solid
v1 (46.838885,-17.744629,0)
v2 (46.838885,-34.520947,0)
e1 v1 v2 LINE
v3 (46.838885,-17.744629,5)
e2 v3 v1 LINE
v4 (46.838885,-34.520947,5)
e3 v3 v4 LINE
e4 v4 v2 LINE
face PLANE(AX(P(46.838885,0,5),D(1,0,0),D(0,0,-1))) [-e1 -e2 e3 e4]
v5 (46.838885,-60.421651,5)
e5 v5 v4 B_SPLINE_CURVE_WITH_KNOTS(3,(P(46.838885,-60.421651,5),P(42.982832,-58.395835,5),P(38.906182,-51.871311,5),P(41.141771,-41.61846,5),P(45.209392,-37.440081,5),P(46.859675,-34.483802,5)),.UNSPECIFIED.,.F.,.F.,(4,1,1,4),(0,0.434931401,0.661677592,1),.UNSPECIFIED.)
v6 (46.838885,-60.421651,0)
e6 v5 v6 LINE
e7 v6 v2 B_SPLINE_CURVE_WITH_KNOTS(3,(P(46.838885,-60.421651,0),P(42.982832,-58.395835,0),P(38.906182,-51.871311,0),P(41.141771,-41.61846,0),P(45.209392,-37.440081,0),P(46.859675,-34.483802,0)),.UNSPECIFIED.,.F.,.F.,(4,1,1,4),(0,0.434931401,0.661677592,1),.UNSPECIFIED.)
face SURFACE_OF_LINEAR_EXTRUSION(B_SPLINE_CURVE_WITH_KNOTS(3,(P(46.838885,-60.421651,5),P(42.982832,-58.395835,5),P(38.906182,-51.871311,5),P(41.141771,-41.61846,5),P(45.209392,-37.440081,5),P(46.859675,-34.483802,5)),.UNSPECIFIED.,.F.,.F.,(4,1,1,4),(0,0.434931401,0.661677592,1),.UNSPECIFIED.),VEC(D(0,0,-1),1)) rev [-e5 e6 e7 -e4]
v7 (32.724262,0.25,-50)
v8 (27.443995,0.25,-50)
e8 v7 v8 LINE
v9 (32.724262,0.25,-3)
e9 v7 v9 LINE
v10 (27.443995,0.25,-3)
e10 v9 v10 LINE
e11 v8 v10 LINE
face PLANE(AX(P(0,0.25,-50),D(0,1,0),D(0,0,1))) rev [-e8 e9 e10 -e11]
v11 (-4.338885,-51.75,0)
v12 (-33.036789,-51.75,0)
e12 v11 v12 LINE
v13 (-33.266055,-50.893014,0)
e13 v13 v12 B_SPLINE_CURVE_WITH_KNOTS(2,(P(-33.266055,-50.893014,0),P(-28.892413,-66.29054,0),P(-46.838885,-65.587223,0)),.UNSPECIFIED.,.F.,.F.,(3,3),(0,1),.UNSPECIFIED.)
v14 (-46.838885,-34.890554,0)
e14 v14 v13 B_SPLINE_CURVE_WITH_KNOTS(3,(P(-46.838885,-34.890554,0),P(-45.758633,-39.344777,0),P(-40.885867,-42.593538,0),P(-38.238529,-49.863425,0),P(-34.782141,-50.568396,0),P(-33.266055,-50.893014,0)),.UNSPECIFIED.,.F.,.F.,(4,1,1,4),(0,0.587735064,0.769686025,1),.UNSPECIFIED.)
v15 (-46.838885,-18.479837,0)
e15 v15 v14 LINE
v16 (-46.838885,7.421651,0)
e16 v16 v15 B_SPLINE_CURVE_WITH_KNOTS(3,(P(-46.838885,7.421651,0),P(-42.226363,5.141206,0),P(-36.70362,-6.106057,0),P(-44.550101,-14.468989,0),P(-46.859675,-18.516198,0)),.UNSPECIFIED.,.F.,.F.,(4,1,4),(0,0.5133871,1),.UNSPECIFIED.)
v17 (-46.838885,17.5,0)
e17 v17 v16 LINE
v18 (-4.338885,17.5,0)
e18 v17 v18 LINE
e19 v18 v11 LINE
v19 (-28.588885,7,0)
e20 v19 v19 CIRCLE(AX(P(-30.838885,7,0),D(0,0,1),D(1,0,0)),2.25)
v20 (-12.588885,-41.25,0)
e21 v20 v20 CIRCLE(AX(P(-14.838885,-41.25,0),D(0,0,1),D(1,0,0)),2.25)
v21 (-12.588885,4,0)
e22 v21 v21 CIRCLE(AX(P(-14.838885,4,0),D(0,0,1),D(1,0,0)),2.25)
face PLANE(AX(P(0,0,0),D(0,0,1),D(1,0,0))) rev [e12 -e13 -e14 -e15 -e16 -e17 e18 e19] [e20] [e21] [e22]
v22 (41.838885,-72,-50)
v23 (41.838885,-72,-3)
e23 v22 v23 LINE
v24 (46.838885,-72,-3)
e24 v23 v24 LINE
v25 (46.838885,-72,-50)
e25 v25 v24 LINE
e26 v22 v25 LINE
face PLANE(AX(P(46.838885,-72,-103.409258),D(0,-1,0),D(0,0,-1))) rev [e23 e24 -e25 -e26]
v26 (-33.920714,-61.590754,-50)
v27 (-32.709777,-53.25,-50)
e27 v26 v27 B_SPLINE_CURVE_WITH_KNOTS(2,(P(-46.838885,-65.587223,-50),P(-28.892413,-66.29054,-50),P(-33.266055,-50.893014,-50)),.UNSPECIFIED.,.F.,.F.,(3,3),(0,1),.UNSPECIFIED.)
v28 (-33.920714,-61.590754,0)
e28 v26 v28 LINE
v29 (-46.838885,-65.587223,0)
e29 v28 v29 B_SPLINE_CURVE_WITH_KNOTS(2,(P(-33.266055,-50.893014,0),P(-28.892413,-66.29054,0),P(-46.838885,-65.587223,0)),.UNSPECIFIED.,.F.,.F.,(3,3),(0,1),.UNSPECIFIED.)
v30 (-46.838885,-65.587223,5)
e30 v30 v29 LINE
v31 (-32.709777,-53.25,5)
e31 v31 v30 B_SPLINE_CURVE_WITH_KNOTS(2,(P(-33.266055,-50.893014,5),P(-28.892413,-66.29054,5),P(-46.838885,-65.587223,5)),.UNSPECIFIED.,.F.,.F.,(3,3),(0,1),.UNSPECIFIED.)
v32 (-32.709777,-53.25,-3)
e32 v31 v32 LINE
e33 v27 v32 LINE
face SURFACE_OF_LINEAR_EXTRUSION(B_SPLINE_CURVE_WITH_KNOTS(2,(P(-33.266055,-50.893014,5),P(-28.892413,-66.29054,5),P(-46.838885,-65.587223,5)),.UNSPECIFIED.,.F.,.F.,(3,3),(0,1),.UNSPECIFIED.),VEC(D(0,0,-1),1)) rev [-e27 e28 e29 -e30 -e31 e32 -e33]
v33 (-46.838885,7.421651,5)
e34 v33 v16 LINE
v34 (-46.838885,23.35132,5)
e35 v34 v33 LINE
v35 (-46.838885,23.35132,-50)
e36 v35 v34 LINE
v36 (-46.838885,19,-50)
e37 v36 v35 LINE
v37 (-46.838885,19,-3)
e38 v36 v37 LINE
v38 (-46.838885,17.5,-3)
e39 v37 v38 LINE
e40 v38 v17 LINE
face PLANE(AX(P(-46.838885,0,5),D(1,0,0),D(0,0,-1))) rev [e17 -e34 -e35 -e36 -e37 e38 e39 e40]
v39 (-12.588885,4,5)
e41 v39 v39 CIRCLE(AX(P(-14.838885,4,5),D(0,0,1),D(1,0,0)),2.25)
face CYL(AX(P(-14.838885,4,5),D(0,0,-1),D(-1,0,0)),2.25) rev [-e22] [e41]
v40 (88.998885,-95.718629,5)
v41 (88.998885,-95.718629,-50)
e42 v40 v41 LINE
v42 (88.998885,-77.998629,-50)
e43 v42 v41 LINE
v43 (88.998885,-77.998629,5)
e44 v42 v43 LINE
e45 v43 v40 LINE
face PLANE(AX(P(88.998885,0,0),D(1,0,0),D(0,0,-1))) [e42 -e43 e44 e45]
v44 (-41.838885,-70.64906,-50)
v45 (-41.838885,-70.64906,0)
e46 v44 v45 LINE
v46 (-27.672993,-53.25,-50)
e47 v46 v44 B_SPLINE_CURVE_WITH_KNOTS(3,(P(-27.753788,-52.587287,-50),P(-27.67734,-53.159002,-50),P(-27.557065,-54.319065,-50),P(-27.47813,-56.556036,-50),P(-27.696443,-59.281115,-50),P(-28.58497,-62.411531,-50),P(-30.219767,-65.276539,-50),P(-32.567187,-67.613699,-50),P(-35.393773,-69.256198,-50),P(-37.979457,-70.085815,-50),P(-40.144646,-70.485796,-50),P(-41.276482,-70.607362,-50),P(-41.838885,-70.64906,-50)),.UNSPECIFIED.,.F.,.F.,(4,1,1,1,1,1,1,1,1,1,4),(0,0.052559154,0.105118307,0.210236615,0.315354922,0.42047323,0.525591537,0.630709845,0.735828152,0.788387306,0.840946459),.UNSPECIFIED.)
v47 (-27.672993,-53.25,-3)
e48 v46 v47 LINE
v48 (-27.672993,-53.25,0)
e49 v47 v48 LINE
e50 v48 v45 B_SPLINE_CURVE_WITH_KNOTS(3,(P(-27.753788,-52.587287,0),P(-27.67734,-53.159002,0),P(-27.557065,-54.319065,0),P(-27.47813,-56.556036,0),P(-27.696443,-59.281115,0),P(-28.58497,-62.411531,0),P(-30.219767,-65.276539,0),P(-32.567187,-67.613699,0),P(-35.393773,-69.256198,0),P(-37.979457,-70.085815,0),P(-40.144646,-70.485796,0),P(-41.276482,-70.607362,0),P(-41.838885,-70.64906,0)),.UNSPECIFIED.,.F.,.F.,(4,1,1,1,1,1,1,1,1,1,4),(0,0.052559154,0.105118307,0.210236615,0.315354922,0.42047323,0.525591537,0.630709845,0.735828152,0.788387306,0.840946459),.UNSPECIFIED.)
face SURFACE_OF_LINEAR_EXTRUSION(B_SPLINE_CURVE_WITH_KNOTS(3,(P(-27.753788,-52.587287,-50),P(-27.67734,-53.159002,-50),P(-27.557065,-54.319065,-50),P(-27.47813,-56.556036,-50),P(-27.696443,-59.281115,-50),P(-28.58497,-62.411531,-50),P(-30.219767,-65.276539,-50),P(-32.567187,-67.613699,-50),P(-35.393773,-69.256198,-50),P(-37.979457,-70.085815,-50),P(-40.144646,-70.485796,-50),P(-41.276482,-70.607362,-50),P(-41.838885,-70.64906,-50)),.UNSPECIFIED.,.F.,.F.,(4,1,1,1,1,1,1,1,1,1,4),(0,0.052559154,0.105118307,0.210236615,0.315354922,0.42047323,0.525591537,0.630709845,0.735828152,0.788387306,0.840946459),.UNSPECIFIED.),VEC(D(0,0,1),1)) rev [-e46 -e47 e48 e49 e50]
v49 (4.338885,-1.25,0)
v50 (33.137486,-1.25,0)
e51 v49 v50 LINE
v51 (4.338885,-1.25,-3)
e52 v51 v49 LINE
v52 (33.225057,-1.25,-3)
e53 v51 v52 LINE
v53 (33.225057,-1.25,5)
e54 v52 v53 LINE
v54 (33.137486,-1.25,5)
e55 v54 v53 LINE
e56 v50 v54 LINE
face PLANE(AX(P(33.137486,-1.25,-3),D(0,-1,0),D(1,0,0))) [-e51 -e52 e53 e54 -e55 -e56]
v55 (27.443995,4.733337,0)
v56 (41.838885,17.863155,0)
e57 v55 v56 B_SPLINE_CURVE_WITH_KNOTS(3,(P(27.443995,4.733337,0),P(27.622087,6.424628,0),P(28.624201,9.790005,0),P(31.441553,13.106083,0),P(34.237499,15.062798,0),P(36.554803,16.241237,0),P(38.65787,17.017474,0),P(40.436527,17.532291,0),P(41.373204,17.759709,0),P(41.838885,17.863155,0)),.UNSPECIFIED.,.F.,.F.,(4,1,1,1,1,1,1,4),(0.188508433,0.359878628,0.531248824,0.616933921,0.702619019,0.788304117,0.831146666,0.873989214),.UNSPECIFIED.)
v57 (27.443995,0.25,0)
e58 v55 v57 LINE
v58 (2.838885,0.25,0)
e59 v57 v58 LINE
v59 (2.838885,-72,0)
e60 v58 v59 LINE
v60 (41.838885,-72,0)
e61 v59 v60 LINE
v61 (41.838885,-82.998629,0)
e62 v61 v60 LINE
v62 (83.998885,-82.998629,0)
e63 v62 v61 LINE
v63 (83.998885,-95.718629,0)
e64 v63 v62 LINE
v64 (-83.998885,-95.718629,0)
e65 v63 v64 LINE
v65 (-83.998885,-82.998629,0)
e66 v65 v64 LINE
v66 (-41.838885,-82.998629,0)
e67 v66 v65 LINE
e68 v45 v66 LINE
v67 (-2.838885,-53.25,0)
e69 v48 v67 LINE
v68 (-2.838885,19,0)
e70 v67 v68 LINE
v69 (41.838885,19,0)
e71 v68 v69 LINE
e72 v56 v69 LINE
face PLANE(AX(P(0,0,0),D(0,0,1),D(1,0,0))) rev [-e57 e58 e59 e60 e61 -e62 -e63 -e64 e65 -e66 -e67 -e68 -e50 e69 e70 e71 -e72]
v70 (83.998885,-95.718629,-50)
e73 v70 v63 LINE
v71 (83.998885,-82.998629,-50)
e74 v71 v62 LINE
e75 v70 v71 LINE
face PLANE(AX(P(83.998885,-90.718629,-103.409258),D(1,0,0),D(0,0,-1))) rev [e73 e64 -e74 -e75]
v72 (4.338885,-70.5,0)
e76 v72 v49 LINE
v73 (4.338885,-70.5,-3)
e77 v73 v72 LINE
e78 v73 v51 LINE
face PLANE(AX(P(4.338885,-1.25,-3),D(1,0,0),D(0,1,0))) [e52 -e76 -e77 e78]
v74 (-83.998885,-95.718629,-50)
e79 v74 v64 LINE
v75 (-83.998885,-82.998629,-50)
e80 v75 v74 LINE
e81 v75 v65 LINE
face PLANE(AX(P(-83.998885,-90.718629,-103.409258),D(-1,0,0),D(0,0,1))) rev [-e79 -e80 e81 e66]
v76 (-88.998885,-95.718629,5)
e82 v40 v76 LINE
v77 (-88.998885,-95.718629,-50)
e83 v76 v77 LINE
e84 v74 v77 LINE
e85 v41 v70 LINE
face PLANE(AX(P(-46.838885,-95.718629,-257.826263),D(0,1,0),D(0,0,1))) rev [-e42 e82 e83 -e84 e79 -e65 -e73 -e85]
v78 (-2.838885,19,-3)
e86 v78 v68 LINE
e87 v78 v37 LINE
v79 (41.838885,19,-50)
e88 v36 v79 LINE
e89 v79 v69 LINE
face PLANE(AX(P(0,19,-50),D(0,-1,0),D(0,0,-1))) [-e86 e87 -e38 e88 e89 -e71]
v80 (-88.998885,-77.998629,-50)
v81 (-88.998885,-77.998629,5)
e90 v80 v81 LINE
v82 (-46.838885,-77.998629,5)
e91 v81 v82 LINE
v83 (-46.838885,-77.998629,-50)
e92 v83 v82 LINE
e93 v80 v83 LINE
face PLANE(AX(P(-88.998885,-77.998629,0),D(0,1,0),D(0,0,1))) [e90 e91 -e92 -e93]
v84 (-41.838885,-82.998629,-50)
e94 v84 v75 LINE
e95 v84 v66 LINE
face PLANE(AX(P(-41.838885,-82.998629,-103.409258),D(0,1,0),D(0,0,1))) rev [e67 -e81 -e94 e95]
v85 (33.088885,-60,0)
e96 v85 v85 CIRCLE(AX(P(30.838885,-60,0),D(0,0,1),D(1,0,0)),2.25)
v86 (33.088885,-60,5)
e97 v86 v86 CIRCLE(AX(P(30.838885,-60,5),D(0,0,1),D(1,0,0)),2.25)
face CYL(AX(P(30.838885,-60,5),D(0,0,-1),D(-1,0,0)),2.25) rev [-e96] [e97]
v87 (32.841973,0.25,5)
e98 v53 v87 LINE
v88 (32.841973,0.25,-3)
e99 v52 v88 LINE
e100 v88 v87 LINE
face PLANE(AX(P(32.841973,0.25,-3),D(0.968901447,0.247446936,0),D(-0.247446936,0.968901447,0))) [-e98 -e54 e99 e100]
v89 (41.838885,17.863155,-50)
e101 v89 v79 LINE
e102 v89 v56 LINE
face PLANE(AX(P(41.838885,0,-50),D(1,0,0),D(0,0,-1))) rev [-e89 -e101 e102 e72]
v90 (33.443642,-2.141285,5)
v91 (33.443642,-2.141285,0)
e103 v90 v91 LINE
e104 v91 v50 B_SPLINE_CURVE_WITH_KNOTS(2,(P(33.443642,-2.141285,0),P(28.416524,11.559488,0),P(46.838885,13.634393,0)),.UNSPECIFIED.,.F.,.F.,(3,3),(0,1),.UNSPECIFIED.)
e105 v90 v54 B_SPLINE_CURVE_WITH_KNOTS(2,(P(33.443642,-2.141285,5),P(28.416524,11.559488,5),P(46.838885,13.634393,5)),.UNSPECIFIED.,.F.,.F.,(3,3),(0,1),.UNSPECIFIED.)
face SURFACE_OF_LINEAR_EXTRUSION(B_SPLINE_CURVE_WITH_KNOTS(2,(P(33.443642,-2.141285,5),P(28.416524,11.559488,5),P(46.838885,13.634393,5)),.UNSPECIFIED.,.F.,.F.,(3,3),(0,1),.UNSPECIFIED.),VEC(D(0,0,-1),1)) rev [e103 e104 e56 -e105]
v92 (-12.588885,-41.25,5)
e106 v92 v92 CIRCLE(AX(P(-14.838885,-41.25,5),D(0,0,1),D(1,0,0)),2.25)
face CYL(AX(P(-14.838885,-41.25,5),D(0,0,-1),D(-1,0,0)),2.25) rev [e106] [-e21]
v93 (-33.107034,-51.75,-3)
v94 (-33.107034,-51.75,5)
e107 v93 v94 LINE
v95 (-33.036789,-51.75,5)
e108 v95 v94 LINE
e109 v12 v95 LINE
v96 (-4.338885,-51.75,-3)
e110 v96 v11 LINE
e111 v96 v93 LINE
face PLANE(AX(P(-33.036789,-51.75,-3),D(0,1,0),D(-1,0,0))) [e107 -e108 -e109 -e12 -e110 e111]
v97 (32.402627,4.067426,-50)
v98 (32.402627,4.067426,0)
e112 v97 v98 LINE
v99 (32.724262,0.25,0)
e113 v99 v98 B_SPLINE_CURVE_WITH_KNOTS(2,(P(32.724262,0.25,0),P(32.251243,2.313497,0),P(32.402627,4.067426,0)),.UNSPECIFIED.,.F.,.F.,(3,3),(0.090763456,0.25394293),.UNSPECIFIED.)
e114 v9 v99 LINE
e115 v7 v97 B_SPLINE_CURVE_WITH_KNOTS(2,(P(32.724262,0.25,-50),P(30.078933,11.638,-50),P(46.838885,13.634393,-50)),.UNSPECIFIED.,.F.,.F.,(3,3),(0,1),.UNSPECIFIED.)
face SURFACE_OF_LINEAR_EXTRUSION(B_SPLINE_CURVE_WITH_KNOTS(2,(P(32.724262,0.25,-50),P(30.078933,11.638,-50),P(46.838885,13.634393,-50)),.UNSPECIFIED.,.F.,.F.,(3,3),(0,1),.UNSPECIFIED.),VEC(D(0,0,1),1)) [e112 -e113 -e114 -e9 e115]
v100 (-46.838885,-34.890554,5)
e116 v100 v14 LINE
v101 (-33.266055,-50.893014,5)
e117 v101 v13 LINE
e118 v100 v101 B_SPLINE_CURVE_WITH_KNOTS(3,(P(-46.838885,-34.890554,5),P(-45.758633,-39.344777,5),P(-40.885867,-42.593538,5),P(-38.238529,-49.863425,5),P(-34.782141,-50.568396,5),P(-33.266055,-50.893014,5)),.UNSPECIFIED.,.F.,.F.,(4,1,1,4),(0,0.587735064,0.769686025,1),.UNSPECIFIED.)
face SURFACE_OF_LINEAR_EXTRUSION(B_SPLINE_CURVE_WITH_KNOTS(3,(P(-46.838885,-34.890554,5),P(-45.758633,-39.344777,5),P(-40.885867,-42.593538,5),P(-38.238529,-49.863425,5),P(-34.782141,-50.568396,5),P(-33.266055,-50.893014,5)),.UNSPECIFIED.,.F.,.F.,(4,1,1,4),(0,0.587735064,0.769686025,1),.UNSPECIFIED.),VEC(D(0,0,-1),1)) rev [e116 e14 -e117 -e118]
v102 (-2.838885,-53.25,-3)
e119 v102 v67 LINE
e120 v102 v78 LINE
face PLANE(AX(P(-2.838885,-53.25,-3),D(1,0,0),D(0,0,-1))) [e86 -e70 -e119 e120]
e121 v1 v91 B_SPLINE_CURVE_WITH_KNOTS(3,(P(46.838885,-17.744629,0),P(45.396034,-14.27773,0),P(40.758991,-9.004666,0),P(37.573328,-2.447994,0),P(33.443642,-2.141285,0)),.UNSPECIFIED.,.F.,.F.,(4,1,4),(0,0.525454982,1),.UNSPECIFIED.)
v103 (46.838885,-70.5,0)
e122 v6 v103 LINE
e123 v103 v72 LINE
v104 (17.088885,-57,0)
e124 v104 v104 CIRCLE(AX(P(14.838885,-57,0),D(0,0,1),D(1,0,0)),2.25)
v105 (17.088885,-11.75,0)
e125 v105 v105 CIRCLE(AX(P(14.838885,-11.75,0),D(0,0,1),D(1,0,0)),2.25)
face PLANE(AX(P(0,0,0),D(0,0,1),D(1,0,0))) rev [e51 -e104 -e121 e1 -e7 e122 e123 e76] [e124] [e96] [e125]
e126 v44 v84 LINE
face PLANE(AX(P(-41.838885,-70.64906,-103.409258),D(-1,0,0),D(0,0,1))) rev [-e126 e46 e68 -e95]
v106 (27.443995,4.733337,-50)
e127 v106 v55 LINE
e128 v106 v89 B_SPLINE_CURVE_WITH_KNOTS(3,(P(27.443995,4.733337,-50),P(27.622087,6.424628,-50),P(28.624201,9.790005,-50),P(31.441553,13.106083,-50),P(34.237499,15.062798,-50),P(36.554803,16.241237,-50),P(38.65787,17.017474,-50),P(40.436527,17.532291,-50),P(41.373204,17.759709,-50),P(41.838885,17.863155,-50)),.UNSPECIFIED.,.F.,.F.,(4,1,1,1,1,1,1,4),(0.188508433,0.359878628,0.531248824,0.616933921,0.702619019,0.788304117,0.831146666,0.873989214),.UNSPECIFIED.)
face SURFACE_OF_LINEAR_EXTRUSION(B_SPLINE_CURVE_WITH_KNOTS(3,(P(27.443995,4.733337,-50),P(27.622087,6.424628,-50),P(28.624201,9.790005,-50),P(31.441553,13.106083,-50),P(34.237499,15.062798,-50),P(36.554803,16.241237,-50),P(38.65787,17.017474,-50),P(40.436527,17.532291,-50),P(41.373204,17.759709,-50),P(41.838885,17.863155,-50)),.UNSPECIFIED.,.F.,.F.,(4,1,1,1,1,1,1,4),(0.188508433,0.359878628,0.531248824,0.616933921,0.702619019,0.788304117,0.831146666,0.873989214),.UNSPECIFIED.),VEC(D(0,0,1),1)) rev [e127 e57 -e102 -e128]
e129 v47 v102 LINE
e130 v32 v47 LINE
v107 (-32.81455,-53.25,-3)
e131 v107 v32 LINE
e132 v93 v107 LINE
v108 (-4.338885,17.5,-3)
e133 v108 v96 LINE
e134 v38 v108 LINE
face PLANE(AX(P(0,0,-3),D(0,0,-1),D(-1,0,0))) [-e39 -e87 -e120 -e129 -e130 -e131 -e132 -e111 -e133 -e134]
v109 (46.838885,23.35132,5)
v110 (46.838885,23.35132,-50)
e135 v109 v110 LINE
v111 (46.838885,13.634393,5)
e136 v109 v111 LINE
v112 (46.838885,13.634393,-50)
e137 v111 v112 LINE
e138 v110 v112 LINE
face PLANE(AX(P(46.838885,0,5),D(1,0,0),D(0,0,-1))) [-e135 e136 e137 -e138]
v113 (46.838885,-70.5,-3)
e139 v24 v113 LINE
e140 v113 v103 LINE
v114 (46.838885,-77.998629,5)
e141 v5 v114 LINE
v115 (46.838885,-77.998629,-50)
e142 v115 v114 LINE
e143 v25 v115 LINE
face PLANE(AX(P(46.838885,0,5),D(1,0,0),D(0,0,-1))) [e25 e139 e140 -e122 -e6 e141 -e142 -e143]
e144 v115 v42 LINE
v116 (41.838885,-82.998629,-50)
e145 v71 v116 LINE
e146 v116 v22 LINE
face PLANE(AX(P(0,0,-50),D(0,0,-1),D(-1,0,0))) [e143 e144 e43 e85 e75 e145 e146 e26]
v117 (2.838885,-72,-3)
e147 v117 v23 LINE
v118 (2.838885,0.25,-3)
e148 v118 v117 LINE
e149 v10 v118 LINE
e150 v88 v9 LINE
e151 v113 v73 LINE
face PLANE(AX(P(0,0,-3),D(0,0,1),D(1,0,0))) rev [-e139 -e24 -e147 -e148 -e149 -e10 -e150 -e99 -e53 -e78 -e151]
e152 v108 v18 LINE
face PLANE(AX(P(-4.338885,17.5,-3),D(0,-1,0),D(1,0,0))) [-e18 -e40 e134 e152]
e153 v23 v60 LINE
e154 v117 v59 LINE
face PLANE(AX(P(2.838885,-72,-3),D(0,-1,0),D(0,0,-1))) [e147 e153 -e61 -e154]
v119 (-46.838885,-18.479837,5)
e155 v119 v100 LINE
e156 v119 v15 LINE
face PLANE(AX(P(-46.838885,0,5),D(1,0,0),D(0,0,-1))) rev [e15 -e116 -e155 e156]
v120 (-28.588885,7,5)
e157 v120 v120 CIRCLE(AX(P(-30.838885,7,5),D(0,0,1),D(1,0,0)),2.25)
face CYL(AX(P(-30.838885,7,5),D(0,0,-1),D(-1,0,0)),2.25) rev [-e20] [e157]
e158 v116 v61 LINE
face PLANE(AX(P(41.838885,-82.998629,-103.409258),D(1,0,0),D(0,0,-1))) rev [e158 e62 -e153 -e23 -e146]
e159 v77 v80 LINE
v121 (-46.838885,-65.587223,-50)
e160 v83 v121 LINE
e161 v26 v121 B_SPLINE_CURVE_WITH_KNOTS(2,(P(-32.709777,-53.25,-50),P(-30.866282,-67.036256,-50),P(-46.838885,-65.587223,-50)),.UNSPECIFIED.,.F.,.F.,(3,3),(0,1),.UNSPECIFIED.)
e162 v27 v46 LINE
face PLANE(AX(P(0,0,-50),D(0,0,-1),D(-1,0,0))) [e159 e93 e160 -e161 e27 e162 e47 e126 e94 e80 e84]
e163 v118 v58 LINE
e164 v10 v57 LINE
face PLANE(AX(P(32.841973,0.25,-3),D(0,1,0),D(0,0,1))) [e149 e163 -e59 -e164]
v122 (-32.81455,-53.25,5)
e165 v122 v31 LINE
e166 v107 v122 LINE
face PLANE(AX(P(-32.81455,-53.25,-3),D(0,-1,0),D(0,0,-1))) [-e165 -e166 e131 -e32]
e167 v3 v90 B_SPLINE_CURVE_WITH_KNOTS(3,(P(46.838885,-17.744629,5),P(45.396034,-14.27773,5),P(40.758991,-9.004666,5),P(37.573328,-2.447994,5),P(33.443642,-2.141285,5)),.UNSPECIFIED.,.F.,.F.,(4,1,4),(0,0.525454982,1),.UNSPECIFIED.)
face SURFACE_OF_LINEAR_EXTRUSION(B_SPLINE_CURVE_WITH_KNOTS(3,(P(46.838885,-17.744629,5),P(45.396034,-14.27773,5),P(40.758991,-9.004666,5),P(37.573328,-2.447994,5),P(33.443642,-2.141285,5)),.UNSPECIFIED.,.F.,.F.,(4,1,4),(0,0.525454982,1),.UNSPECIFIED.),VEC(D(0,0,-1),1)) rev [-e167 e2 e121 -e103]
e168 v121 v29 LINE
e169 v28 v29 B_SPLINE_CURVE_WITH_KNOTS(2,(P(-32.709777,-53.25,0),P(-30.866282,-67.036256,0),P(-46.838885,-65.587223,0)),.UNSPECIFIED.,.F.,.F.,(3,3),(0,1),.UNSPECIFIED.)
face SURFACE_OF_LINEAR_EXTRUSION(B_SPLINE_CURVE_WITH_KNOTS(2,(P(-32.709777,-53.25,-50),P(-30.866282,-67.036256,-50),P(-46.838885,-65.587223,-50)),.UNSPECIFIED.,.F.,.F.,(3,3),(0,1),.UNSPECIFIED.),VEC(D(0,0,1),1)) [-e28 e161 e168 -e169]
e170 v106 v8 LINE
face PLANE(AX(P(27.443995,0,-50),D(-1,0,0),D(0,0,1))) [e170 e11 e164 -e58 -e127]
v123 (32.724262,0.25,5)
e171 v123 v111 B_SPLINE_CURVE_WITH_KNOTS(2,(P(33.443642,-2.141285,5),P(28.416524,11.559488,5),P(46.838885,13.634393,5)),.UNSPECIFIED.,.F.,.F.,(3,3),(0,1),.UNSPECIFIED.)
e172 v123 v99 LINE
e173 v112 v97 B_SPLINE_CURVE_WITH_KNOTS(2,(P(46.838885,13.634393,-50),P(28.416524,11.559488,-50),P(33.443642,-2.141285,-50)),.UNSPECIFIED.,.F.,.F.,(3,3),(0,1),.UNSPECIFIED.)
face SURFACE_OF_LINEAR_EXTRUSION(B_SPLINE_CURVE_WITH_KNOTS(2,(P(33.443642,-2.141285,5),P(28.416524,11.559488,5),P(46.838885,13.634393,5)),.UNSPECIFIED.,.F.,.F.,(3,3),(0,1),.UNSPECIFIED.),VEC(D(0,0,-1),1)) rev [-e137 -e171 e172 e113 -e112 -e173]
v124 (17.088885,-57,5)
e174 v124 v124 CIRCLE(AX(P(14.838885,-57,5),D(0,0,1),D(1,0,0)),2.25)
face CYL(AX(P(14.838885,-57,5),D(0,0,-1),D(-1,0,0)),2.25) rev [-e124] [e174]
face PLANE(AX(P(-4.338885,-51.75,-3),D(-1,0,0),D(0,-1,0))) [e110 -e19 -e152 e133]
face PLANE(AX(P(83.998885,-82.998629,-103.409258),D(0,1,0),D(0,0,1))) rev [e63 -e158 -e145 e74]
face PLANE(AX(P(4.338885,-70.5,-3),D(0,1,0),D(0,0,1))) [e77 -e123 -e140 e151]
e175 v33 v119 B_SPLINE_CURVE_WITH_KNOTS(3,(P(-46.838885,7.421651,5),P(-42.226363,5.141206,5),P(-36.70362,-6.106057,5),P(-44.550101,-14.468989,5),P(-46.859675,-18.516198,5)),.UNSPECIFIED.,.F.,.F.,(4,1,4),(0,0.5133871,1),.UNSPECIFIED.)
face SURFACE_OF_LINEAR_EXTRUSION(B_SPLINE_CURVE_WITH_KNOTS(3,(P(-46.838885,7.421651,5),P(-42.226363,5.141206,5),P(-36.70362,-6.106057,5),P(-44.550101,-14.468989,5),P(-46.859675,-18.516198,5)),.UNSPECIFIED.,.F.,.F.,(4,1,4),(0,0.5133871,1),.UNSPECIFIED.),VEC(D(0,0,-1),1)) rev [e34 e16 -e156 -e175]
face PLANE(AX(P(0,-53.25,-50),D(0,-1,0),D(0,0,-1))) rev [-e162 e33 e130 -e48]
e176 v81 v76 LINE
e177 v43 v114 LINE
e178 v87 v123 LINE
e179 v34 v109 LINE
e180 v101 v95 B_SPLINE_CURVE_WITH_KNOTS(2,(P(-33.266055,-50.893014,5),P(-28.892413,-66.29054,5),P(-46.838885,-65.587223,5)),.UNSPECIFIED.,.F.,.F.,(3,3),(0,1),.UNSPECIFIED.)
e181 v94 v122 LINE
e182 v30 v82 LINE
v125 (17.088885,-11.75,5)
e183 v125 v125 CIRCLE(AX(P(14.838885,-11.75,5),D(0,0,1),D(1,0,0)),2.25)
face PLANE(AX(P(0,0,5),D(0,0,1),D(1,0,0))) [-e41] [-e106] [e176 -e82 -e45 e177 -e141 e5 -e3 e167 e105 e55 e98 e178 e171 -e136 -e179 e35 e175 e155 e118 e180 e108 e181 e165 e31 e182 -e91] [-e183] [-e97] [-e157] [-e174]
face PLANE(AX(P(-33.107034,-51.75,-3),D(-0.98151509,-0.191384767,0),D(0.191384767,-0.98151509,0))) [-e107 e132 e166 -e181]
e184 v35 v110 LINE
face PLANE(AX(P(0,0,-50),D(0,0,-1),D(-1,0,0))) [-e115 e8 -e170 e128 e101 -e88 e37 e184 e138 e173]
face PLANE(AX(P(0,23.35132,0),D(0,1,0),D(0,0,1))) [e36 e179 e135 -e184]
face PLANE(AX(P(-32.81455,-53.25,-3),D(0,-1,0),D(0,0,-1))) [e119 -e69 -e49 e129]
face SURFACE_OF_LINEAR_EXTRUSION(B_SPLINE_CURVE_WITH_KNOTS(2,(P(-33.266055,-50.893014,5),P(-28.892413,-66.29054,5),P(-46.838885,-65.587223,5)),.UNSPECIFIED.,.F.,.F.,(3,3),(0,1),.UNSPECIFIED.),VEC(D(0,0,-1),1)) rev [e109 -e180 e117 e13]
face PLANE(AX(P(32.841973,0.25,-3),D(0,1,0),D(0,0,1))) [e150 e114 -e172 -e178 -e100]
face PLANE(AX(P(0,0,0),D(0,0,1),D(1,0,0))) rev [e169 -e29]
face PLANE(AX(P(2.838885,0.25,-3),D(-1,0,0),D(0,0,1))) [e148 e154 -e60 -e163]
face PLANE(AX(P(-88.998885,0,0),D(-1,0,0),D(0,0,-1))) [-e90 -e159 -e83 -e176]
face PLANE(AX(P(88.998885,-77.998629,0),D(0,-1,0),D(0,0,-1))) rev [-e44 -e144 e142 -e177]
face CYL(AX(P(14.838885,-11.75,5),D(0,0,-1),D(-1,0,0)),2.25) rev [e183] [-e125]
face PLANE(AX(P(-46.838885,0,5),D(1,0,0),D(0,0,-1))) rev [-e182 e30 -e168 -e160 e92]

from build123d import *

# Parameters (mm, degrees)
SKETCH1_R            = 2.25
BOSS_EXTRUDE1_DEPTH  = 5
SKETCH7_R            = 2
CUT_EXTRUDE1_DEPTH   = 10
SKETCH10_W           = 93.677769422
SKETCH10_H           = 89.648680449
CUT_EXTRUDE4_DEPTH   = 10
LPATTERN1_COUNT      = 2
LPATTERN1_PITCH      = 144.65
SKETCH13_W           = 93.677769422
SKETCH13_H           = 54.298680449
BOSS_EXTRUDE2_DEPTH  = 5
SKETCH18_W           = 93.677769422
SKETCH18_H           = 5
BOSS_EXTRUDE5_DEPTH  = 5
BOSS_EXTRUDE7_DEPTH  = 8
SKETCH19_W           = 93.677769422
SKETCH19_H           = 5
BOSS_EXTRUDE8_DEPTH  = 47
SKETCH21_W           = 93.677769422
SKETCH21_H           = 5
BOSS_EXTRUDE9_DEPTH  = 3
BOSS_EXTRUDE10_DEPTH = 50
CUT_EXTRUDE5_REACH   = 289.015
FILLET1_R            = 10
SKETCH25_W           = 93.677769422
SKETCH25_H           = 185.51612098
CUT_EXTRUDE7_DEPTH   = 55
SKETCH26_W           = 5
SKETCH26_H           = 17.72
BOSS_EXTRUDE11_DEPTH = 42.16
BOSS_EXTRUDE12_DEPTH = 50


# Read off the part's stored shape, not the designer's step: Boss-Extrude10
with BuildPart() as part:
    # Sketch1 → Boss-Extrude1 (new body)
    with BuildSketch(Plane.XY):
        with BuildLine():
            Line((0, 110), (-46.838884711, 110))
            Line((-46.838884711, 110), (-46.838884711, 100.421650596))
            add(Edge.make_bspline(
                [(-46.838884711, 100.421650596), (-42.226362844, 98.141206473), (-36.711667831, 86.910333368), (-44.527260711, 78.55539065), (-46.838884711, 74.520163403)],
                knots=[0, 0, 0, 0, 0.5133871, 0.998542736, 0.998542736, 0.998542736, 0.998542736], degree=3))
            Line((-46.838884711, 74.520163403), (-46.838884711, 58.109446399))
            add(Edge.make_bspline(
                [(-46.838884711, 58.109446399), (-45.758632516, 53.655222634), (-40.885867203, 50.40646242), (-38.238529072, 43.136574556), (-34.782140744, 42.431604419), (-33.266055192, 42.106985538)],
                knots=[0, 0, 0, 0, 0.587735064, 0.769686025, 1, 1, 1, 1], degree=3))
            add(Edge.make_bspline(
                [(-33.266055192, 42.106985538), (-28.892413212, 26.709459558), (-46.838884711, 27.412777151)],
                knots=[0, 0, 0, 1, 1, 1], degree=2))
            Line((-46.838884711, 27.412777151), (-46.838884711, 7.421650596))
            add(Edge.make_bspline(
                [(-46.838884711, 7.421650596), (-42.226362844, 5.141206473), (-36.711667831, -6.089666632), (-44.527260711, -14.44460935), (-46.838884711, -18.479836597)],
                knots=[0, 0, 0, 0, 0.5133871, 0.998542736, 0.998542736, 0.998542736, 0.998542736], degree=3))
            Line((-46.838884711, -18.479836597), (-46.838884711, -34.890553601))
            add(Edge.make_bspline(
                [(-46.838884711, -34.890553601), (-45.758632516, -39.344777366), (-40.885867203, -42.59353758), (-38.238529072, -49.863425444), (-34.782140744, -50.568395581), (-33.266055192, -50.893014462)],
                knots=[0, 0, 0, 0, 0.587735064, 0.769686025, 1, 1, 1, 1], degree=3))
            add(Edge.make_bspline(
                [(-33.266055192, -50.893014462), (-28.892413212, -66.290540442), (-46.838884711, -65.587222849)],
                knots=[0, 0, 0, 1, 1, 1], degree=2))
            Line((-46.838884711, -65.587222849), (-46.838884711, -70))
            Line((-46.838884711, -70), (0, -70))
            Line((0, -70), (46.838884711, -70))
            Line((46.838884711, -70), (46.838884711, -60.421650596))
            add(Edge.make_bspline(
                [(46.838884711, -60.421650596), (42.982832164, -58.395834606), (38.906182163, -51.871311027), (41.138601483, -41.632996987), (45.188996373, -37.461060264), (46.838884711, -34.520947075)],
                knots=[0, 0, 0, 0, 0.434931401, 0.661677592, 0.998582109, 0.998582109, 0.998582109, 0.998582109], degree=3))
            Line((46.838884711, -34.520947075), (46.838884711, -17.744628899))
            add(Edge.make_bspline(
                [(46.838884711, -17.744628899), (45.396033977, -14.277729688), (40.758990778, -9.004665614), (37.573327769, -2.447994476), (33.443642317, -2.141285146)],
                knots=[0, 0, 0, 0, 0.525454982, 1, 1, 1, 1], degree=3))
            add(Edge.make_bspline(
                [(33.443642317, -2.141285146), (28.416523532, 11.559488336), (46.838884711, 13.634393344)],
                knots=[0, 0, 0, 1, 1, 1], degree=2))
            Line((46.838884711, 13.634393344), (46.838884711, 32.578349404))
            add(Edge.make_bspline(
                [(46.838884711, 32.578349404), (42.982832164, 34.604165394), (38.906182163, 41.128688973), (41.138601483, 51.367003013), (45.188996373, 55.538939736), (46.838884711, 58.479052925)],
                knots=[0, 0, 0, 0, 0.434931401, 0.661677592, 0.998582109, 0.998582109, 0.998582109, 0.998582109], degree=3))
            Line((46.838884711, 58.479052925), (46.838884711, 75.255371101))
            add(Edge.make_bspline(
                [(46.838884711, 75.255371101), (45.396033977, 78.722270312), (40.758990778, 83.995334386), (37.573327769, 90.552005524), (33.443642317, 90.858714854)],
                knots=[0, 0, 0, 0, 0.525454982, 1, 1, 1, 1], degree=3))
            Line((33.443642317, 90.858714854), (0, 110))
        make_face()
        with Locations((-14.838884711, -41.25)):
            Circle(SKETCH1_R, mode=Mode.SUBTRACT)
        with Locations((-30.838884711, 7)):
            Circle(SKETCH1_R, mode=Mode.SUBTRACT)
        with Locations((-14.838884711, 4)):
            Circle(SKETCH1_R, mode=Mode.SUBTRACT)
        with Locations((14.838884711, -57)):
            Circle(SKETCH1_R, mode=Mode.SUBTRACT)
        with Locations((30.838884711, -60)):
            Circle(SKETCH1_R, mode=Mode.SUBTRACT)
        with Locations((14.838884711, -11.75)):
            Circle(SKETCH1_R, mode=Mode.SUBTRACT)
        with Locations((-14.838884711, 51.75)):
            Circle(SKETCH1_R, mode=Mode.SUBTRACT)
        with Locations((-30.838884711, 100)):
            Circle(SKETCH1_R, mode=Mode.SUBTRACT)
        with Locations((-14.838884711, 97)):
            Circle(SKETCH1_R, mode=Mode.SUBTRACT)
        with Locations((14.838884711, 36)):
            Circle(SKETCH1_R, mode=Mode.SUBTRACT)
        with Locations((30.838884711, 33)):
            Circle(SKETCH1_R, mode=Mode.SUBTRACT)
        with Locations((14.838884711, 81.25)):
            Circle(SKETCH1_R, mode=Mode.SUBTRACT)
    extrude(amount=BOSS_EXTRUDE1_DEPTH)

    # Sketch7 → Cut-Extrude1 (cut)
    with BuildSketch(Plane.XY.offset(5)):
        with Locations((-41.838884711, 23.5)):
            Circle(SKETCH7_R)
        with Locations((-41.838884711, 67)):
            Circle(SKETCH7_R)
        with Locations((40.861115289, 67)):
            Circle(SKETCH7_R)
        with Locations((40.861115289, 23.5)):
            Circle(SKETCH7_R)
    extrude(amount=-CUT_EXTRUDE1_DEPTH, mode=Mode.SUBTRACT)

    # Sketch10 → Cut-Extrude4 (cut)
    with BuildSketch(Plane.XY.offset(5)):
        with Locations((0, 65.175659775)):
            Rectangle(SKETCH10_W, SKETCH10_H)
    extrude(amount=-CUT_EXTRUDE4_DEPTH, mode=Mode.SUBTRACT)


with BuildPart() as lpattern1_1:
    # LPattern1: pattern copy
    add(part.part.moved(Location(Vector(0, -1, 0) * (1 * LPATTERN1_PITCH))))


with BuildPart() as part_1:
    add(part.part)

    add(lpattern1_1.part)  # Boss-Extrude2 merges LPattern1_1
    # Sketch13 → Boss-Extrude2 (add)
    with BuildSketch(Plane.XY.offset(5)):
        with Locations((0, -97.149340225)):
            Rectangle(SKETCH13_W, SKETCH13_H)
    extrude(amount=-BOSS_EXTRUDE2_DEPTH)

    # Sketch18 → Boss-Extrude5 (add)
    with BuildSketch(Plane.XY.offset(5)):
        with Locations((0, -217.15)):
            Rectangle(SKETCH18_W, SKETCH18_H)
    extrude(amount=-BOSS_EXTRUDE5_DEPTH)

    # Sketch17 → Boss-Extrude7 (add)
    with BuildSketch(Plane.XY.offset(5)):
        Polygon((33.137486483, -1.25), (4.338884711, -1.25), (4.338884711, -70.5), (46.838884711, -70.5), (46.838884711, -72), (2.838884711, -72), (2.838884711, 0.25), (32.841973097, 0.25), (33.225056852, -1.25), align=None)
        Polygon((-33.036788629, -51.75), (-4.338884711, -51.75), (-4.338884711, 17.5), (-46.838884711, 17.5), (-46.838884711, 19), (-2.838884711, 19), (-2.838884711, -53.25), (-32.814550412, -53.25), (-33.107034097, -51.75), align=None)
        Polygon((-33.036788629, -196.4), (-4.338884711, -196.4), (-4.338884711, -127.15), (-46.838884711, -127.15), (-46.838884711, -125.65), (-2.838884711, -125.65), (-2.838884711, -197.9), (-32.814550412, -197.9), (-33.107034097, -196.4), align=None)
        Polygon((33.137486483, -145.9), (4.338884711, -145.9), (4.338884711, -215.15), (46.838884711, -215.15), (46.838884711, -216.65), (2.838884711, -216.65), (2.838884711, -144.4), (32.841973097, -144.4), (33.225056852, -145.9), align=None)
    extrude(amount=-BOSS_EXTRUDE7_DEPTH)

    # Sketch19 → Boss-Extrude8 (add)
    with BuildSketch(Plane.XZ.offset(219.65)):
        with Locations((0, 2.5)):
            Rectangle(SKETCH19_W, SKETCH19_H)
    extrude(amount=BOSS_EXTRUDE8_DEPTH)

    # Sketch21 → Boss-Extrude9 (add)
    with BuildSketch(Plane(origin=(0, 20.351319551, 0), x_dir=(1, 0, 0), z_dir=(0, 1, 0))):
        with Locations((0, -2.5)):
            Rectangle(SKETCH21_W, SKETCH21_H)
    extrude(amount=BOSS_EXTRUDE9_DEPTH)

    # Boss-Extrude10 outline → Boss-Extrude10 (add)
    with BuildSketch(Plane(origin=(0, 0, 0), x_dir=(-1, 0, 0), z_dir=(0, 0, -1))):
        with BuildLine():
            add(Edge.make_bspline(
                [(-32.724261898, 0.25), (-32.245095706, 2.312784936), (-32.402626668, 4.067426464)],
                knots=[0, 0, 0, 0.181136716, 0.181136716, 0.181136716], degree=2))
            Line((-32.724261898, 0.25), (-27.443994886, 0.25))
            Line((-27.443994886, 0.25), (-27.443994886, 4.733336658))
            add(Edge.make_bspline(
                [(-27.443994886, 4.733336658), (-27.622087216, 6.424627618), (-28.62420051, 9.790004967), (-31.441552833, 13.106082614), (-34.237499241, 15.062797915), (-36.55480341, 16.241237453), (-38.657870419, 17.017473528), (-40.436527292, 17.53229138), (-41.373204052, 17.759709119), (-41.838884711, 17.863154596)],
                knots=[0.188508433, 0.188508433, 0.188508433, 0.188508433, 0.359878628, 0.531248824, 0.616933921, 0.702619019, 0.788304117, 0.831146666, 0.873989214, 0.873989214, 0.873989214, 0.873989214], degree=3))
            Line((-41.838884711, 17.863154596), (-41.838884711, 19))
            Line((-41.838884711, 19), (46.838884711, 19))
            Line((46.838884711, 19), (46.838884711, 23.351319551))
            Line((46.838884711, 23.351319551), (-46.838884711, 23.351319551))
            Line((-46.838884711, 23.351319551), (-46.838884711, 13.634393344))
            add(Edge.make_bspline(
                [(-32.402626668, 4.067426464), (-33.094751911, 12.086395793), (-46.838884711, 13.634393344)],
                knots=[0.25394293, 0.25394293, 0.25394293, 1, 1, 1], degree=2))
        make_face()
        with BuildLine():
            add(Edge.make_bspline(
                [(32.709776931, -53.25), (31.734780647, -58.560461643), (33.920713563, -61.590754477)],
                knots=[0.079873384, 0.079873384, 0.079873384, 0.456195017, 0.456195017, 0.456195017], degree=2))
            Line((32.709776931, -53.25), (27.672993194, -53.25))
            add(Edge.make_bspline(
                [(27.672993194, -53.25), (27.634044039, -53.603919753), (27.549470722, -54.53429273), (27.478130031, -56.55603599), (27.696443256, -59.281114668), (28.584970164, -62.41153087), (30.219766888, -65.27653857), (32.567186832, -67.613698936), (35.393773129, -69.256198214), (37.979457465, -70.085815151), (40.144646291, -70.485795849), (41.276481585, -70.607362141), (41.838884711, -70.649060215)],
                knots=[0.020227728, 0.020227728, 0.020227728, 0.020227728, 0.052559154, 0.105118307, 0.210236615, 0.315354922, 0.42047323, 0.525591537, 0.630709845, 0.735828152, 0.788387306, 0.840946459, 0.840946459, 0.840946459, 0.840946459], degree=3))
            Line((41.838884711, -70.649060215), (46.838884711, -70.649060215))
            Line((46.838884711, -70.649060215), (46.838884711, -65.587222848))
            add(Edge.make_bspline(
                [(33.920713563, -61.590754477), (36.999202525, -66.479878046), (46.838884711, -65.587222848)],
                knots=[0.383965009, 0.383965009, 0.383965009, 1, 1, 1], degree=2))
        make_face()
        with BuildLine():
            add(Edge.make_bspline(
                [(-32.724261899, -144.4), (-32.245095735, -142.337215187), (-32.40262665, -140.582573745)],
                knots=[0, 0, 0, 0.181136705, 0.181136705, 0.181136705], degree=2))
            Line((-32.724261899, -144.4), (-27.624350546, -144.4))
            add(Edge.make_bspline(
                [(-27.624350546, -144.4), (-27.502918691, -143.696257513), (-27.293028635, -141.891316279), (-27.435749972, -139.015823853), (-28.37747966, -135.845139515), (-30.113029915, -133.024976386), (-32.462833621, -130.741878365), (-35.232498366, -128.995170141), (-37.82646734, -127.905854752), (-40.056119375, -127.214276507), (-41.247409264, -126.918228045), (-41.838884711, -126.786845404)],
                knots=[0.038284513, 0.038284513, 0.038284513, 0.038284513, 0.109248652, 0.218497304, 0.327745955, 0.436994607, 0.546243259, 0.655491911, 0.764740563, 0.819364888, 0.873989214, 0.873989214, 0.873989214, 0.873989214], degree=3))
            Line((-41.838884711, -126.786845404), (-46.838884711, -126.786845404))
            Line((-46.838884711, -126.786845404), (-46.838884711, -131.015606656))
            add(Edge.make_bspline(
                [(-32.40262665, -140.582573745), (-33.094751732, -132.563604227), (-46.838884711, -131.015606656)],
                knots=[0.25394292, 0.25394292, 0.25394292, 1, 1, 1], degree=2))
        make_face()
        with BuildLine():
            add(Edge.make_bspline(
                [(32.709776931, -197.9), (31.734780645, -203.210461655), (33.920713573, -206.240754491)],
                knots=[0.079873384, 0.079873384, 0.079873384, 0.456195018, 0.456195018, 0.456195018], degree=2))
            Line((32.709776931, -197.9), (27.672993196, -197.9))
            add(Edge.make_bspline(
                [(27.672993196, -197.9), (27.63404404, -198.253919753), (27.549470724, -199.184292729), (27.478130032, -201.206035989), (27.696443257, -203.931114667), (28.584970165, -207.061530869), (30.219766889, -209.926538569), (32.567186833, -212.263698936), (35.393773129, -213.906198214), (37.979457465, -214.73581515), (40.144646291, -215.135795849), (41.276481585, -215.25736214), (41.838884711, -215.299060215)],
                knots=[0.020227728, 0.020227728, 0.020227728, 0.020227728, 0.052559154, 0.105118307, 0.210236615, 0.315354922, 0.42047323, 0.525591537, 0.630709845, 0.735828152, 0.788387306, 0.84094646, 0.84094646, 0.84094646, 0.84094646], degree=3))
            Line((41.838884711, -215.299060215), (41.838884711, -261.65))
            Line((41.838884711, -261.65), (-41.838884711, -261.65))
            Line((-41.838884711, -261.65), (-41.838884711, -216.65))
            Line((-41.838884711, -216.65), (-46.838884711, -216.65))
            Line((-46.838884711, -216.65), (-46.838884711, -266.65))
            Line((-46.838884711, -266.65), (46.838884711, -266.65))
            Line((46.838884711, -266.65), (46.838884711, -210.237222849))
            add(Edge.make_bspline(
                [(33.920713573, -206.240754491), (36.999202539, -211.129878044), (46.838884711, -210.237222849)],
                knots=[0.38396501, 0.38396501, 0.38396501, 1, 1, 1], degree=2))
        make_face()
    extrude(amount=BOSS_EXTRUDE10_DEPTH)

    # Cut-Extrude5: up to this face of the body (flat: up to its plane)
    cut_extrude5_end = Plane(part_1.part.faces().sort_by_distance((46.838884711, -170.782787987, 2.5))[0])
    # Sketch24 → Cut-Extrude5 (cut, up to the picked face)
    with BuildSketch(Plane.ZY.offset(46.838884711), mode=Mode.PRIVATE) as cut_extrude5_sk1:
        Polygon((-50, -266.65), (5, -256.952016061), (5, -266.65), align=None)
    cut_extrude5_tool1 = split(extrude(cut_extrude5_sk1.sketch, amount=-CUT_EXTRUDE5_REACH, mode=Mode.PRIVATE), bisect_by=cut_extrude5_end, keep=Keep.BOTH, mode=Mode.PRIVATE)
    add(cut_extrude5_tool1.solids().sort_by(Axis((-46.838885, -263.417339, -13.333333), (1, 0, 0)))[0], mode=Mode.SUBTRACT)

    # Fillet1
    # the kernel refuses this fillet: 10 mm, written as the material it takes off along each edge
    with BuildSketch(Plane(origin=(46.838884711, -270.991204442, -74.620193825), x_dir=(0, 0.9848077530122092, -0.17364817766692375), z_dir=(0, 0.17364817766692378, 0.9848077530122094)), Plane(origin=(-46.838884711, -270.991204442, -74.620193825), x_dir=(1, 0, 0), z_dir=(0, 0.17364817766692378, 0.9848077530122094))) as fillet1_piece_1:
        with BuildLine():
            CenterArc((FILLET1_R, FILLET1_R), FILLET1_R, 180, 90)
            Line((0, FILLET1_R), (0, 0))
            Line((0, 0), (FILLET1_R, 0))
        make_face()
    extrude(amount=105.848463654, mode=Mode.SUBTRACT)

    # Sketch25 → Cut-Extrude7 (cut)
    with BuildSketch(Plane.XY.offset(5)):
        with Locations((0, -188.476689117)):
            Rectangle(SKETCH25_W, SKETCH25_H)
    extrude(amount=-CUT_EXTRUDE7_DEPTH, mode=Mode.SUBTRACT)

    # Sketch26 → Boss-Extrude11 (add)
    with BuildSketch(Plane(origin=(46.838884711, 0, 0), x_dir=(0, 0, -1), z_dir=(1, 0, 0))):
        with Locations((-2.5, -86.858628627)):
            Rectangle(SKETCH26_W, SKETCH26_H)
    boss_extrude11 = extrude(amount=BOSS_EXTRUDE11_DEPTH)

    # Mirror1: Boss-Extrude11 across plane
    add(boss_extrude11.mirror(Plane(origin=(0, 0, 0), x_dir=(0, 0, 1), z_dir=(1, 0, 0))))

    # Sketch27 → Boss-Extrude12 (add)
    with BuildSketch(Plane(origin=(0, 0, 0), x_dir=(-1, 0, 0), z_dir=(0, 0, -1))):
        Polygon((46.838884711, -70.649060215), (46.838884711, -77.998628627), (88.998884711, -77.998628627), (88.998884711, -95.718628627), (83.998884711, -95.718628627), (83.998884711, -90.718628627), (83.998884711, -82.998628627), (41.838884711, -82.998628627), (41.838884711, -70.649060215), align=None)
        Polygon((-88.998884711, -95.718628627), (-88.998884711, -77.998628627), (-46.838884711, -77.998628627), (-46.838884711, -72), (-41.838884711, -72), (-41.838884711, -82.998628627), (-83.998884711, -82.998628627), (-83.998884711, -90.718628627), (-83.998884711, -95.718628627), align=None)
    extrude(amount=BOSS_EXTRUDE12_DEPTH)


solid = part_1.part
